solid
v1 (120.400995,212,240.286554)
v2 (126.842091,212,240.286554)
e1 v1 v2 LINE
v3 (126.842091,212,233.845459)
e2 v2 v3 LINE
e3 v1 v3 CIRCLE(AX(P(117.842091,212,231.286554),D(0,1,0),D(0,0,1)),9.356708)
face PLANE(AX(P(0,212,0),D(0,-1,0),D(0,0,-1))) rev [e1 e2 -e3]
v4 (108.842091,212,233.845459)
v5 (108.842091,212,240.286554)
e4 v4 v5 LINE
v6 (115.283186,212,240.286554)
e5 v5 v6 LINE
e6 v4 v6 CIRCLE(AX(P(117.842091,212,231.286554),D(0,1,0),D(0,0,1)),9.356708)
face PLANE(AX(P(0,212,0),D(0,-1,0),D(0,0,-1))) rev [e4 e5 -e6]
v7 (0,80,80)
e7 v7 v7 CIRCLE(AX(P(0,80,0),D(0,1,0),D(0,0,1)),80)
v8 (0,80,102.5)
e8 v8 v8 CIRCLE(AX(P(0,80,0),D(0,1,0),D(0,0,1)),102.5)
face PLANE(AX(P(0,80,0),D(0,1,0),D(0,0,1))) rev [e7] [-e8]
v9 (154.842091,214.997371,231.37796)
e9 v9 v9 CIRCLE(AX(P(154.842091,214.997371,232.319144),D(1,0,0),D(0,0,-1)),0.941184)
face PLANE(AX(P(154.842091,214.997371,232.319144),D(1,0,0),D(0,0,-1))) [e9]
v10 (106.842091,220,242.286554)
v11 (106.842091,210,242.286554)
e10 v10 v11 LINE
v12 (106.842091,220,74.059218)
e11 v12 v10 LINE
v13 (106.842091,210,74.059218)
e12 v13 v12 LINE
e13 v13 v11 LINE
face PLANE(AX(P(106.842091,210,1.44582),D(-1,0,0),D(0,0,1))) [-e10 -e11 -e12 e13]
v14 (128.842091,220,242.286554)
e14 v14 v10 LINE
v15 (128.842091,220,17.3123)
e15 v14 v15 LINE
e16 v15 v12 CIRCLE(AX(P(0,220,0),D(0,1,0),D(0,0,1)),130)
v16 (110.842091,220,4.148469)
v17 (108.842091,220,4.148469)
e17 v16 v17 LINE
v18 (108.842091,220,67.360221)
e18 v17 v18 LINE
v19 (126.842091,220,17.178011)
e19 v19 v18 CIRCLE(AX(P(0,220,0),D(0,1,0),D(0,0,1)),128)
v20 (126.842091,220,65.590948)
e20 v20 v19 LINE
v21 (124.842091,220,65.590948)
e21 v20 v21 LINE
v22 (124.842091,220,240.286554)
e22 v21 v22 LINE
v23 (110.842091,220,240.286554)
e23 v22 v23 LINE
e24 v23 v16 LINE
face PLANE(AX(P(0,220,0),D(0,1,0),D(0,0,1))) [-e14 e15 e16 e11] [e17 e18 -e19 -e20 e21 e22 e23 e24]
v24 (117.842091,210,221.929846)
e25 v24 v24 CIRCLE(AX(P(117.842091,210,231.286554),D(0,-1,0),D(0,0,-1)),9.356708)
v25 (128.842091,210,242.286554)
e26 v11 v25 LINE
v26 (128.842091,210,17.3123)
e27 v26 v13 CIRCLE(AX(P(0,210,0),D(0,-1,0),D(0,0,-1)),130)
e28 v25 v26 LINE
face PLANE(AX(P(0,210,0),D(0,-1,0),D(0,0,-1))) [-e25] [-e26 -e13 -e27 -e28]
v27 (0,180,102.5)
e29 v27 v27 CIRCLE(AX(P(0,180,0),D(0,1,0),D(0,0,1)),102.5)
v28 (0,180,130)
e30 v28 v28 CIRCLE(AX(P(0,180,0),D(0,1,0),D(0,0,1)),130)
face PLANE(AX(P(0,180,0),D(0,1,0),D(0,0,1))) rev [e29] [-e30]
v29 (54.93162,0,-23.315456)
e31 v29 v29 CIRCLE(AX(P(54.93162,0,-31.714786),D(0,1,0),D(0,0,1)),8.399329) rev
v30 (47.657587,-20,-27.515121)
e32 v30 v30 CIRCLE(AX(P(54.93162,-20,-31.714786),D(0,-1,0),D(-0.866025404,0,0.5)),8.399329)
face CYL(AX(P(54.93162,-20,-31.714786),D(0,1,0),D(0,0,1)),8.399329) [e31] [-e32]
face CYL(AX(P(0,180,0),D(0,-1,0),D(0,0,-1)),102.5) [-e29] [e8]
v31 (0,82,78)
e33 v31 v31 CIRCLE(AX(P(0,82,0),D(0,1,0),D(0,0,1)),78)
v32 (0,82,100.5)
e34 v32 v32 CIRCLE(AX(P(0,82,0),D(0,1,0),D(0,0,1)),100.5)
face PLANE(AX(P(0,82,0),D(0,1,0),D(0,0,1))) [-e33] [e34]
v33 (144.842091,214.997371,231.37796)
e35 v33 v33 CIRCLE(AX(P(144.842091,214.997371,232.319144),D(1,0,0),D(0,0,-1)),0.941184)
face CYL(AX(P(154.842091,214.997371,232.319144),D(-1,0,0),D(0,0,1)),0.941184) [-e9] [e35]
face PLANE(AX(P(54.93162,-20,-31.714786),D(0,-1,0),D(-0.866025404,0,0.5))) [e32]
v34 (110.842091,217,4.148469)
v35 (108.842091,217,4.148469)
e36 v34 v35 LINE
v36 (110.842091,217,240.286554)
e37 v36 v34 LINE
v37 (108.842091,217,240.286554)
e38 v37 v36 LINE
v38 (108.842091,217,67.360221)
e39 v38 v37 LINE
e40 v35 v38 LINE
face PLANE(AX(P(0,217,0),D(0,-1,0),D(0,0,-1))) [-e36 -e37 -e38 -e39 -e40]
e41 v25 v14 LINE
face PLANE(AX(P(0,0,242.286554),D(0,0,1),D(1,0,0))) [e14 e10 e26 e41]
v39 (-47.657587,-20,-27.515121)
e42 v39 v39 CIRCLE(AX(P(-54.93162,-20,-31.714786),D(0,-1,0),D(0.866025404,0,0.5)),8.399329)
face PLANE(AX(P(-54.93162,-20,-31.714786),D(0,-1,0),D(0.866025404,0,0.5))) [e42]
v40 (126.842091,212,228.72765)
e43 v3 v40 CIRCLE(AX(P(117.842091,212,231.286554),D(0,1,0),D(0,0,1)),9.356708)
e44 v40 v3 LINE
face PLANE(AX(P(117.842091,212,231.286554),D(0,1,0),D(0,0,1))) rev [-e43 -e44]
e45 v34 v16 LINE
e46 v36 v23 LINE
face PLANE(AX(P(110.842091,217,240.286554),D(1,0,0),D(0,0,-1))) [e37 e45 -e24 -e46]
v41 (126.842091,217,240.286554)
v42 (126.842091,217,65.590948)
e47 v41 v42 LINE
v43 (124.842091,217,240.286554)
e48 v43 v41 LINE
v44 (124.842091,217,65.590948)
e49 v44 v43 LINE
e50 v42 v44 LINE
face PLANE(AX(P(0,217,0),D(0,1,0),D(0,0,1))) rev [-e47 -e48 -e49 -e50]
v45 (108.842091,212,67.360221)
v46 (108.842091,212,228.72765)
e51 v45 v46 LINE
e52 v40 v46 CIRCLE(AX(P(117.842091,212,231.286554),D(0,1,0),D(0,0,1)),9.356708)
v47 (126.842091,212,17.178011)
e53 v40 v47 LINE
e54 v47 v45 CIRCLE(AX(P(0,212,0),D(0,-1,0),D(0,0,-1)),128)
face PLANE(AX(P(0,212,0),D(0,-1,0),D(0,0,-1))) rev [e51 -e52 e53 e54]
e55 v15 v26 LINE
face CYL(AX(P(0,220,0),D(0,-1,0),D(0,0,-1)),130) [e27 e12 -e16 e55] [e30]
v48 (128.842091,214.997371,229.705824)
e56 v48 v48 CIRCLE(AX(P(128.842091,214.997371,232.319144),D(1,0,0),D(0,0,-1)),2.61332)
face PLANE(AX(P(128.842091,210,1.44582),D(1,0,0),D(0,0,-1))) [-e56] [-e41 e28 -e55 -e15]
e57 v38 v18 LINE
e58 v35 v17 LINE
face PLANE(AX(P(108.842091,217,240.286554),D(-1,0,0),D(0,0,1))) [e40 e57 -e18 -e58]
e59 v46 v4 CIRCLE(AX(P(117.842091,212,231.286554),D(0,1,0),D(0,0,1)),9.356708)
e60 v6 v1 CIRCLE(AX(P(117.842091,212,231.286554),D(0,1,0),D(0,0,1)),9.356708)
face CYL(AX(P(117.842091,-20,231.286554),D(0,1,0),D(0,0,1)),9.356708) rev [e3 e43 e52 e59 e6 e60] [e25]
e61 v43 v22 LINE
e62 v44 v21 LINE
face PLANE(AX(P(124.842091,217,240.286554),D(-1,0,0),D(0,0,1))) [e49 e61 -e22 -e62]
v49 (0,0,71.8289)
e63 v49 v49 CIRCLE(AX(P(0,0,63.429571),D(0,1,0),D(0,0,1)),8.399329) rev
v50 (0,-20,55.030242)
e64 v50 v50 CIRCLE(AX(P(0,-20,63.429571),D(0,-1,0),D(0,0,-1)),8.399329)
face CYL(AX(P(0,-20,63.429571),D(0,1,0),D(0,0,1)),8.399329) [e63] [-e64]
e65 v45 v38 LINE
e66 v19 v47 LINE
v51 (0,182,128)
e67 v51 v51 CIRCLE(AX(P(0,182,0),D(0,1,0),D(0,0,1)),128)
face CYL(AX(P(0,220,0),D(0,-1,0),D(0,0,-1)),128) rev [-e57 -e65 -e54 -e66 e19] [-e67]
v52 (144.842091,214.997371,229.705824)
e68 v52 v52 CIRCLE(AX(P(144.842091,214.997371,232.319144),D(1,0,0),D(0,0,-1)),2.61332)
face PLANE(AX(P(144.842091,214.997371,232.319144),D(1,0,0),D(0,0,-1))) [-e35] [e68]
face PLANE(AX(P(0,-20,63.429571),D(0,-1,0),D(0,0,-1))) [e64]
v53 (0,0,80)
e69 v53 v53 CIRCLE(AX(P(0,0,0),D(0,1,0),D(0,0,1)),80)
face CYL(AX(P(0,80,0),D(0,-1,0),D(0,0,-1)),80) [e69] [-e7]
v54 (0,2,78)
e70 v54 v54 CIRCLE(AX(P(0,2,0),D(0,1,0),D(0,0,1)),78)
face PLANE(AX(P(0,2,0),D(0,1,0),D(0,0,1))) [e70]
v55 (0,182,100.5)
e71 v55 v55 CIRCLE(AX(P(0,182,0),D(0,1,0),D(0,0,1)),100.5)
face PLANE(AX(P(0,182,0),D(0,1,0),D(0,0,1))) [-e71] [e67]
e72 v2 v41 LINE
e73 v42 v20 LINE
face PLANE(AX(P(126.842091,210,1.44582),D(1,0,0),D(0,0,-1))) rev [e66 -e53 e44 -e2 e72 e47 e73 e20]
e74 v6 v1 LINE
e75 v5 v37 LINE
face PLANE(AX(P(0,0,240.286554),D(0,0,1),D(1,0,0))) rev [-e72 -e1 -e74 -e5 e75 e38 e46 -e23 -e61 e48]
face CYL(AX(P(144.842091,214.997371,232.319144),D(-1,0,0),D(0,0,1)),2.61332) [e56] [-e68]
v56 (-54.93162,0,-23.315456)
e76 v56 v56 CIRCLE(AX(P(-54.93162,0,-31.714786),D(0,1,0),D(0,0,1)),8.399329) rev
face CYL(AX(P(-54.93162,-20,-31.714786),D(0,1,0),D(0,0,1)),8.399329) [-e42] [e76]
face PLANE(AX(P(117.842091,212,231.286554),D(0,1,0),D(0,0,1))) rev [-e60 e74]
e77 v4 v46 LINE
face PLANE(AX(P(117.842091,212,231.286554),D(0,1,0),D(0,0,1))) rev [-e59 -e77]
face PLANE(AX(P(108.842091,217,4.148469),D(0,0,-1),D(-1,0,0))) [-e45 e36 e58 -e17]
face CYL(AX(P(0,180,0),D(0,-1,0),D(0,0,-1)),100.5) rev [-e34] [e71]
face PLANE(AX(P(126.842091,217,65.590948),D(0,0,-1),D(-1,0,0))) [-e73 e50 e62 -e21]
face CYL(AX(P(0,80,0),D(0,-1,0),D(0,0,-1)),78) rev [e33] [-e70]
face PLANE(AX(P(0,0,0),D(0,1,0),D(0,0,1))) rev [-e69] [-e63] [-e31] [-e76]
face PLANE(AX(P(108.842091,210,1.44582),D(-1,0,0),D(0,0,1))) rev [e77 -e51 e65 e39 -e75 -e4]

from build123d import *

# Parameters (mm, degrees)
SKETCH_3_R               = 80
EXTRUDE_1_DEPTH          = 80
SKETCH_4_R               = 102.5
EXTRUDE_2_DEPTH          = 100
SKETCH_5_R               = 130
EXTRUDE_3_DEPTH          = 40
SKETCH_6_W               = 22
SKETCH_6_H               = 240.840734586
EXTRUDE_4_DEPTH          = 10
SHELL_START              = 82
SHELL_1_OUTLINE_R        = 100.5
SHELL_1_DEPTH            = 138
SHELL_START_2            = 2
SHELL_1_2_OUTLINE_R      = 78
SHELL_1_2_DEPTH          = 80
SHELL_START_3            = 182
SHELL_1_3_OUTLINE_R      = 128
SHELL_1_3_OUTLINE_R_2    = 100.5
SHELL_1_3_DEPTH          = 38
SHELL_START_4            = 212
SHELL_1_4_DEPTH          = 8
SKETCH_7_R               = 8.399329468
EXTRUDE_5_DEPTH          = 20
PATTERN_CIRCULAR_1_COUNT = 3
SKETCH_9_W               = 22
SKETCH_9_H               = 2
CUT_EXTRUDE_1_DEPTH      = 365.969552782
SKETCH_10_W              = 2
SKETCH_10_H              = 236.138085802
SKETCH_10_H_2            = 174.695606664
EXTRUDE_6_DEPTH          = 3
SKETCH_11_W              = 22
SKETCH_11_H              = 10
EXTRUDE_7_DEPTH          = 2
SKETCH_12_R              = 9.35670837
CUT_EXTRUDE_2_DEPTH      = 360.759328521
SKETCH_13_R              = 2.613319885
EXTRUDE_8_DEPTH          = 16
SKETCH_14_R              = 0.941183601
EXTRUDE_9_DEPTH          = 10


# Read off the part's stored shape, not the designer's step: 抽壳1
with BuildPart() as part:
    # 草图3 → 凸台-拉伸1 (new body)
    with BuildSketch(Plane(origin=(0, 0, 0), x_dir=(1, 0, 0), z_dir=(0, 1, 0))):
        with Locations(Location((0, 0, 0), (0, 0, 270))):
            Circle(SKETCH_3_R)
    extrude(amount=EXTRUDE_1_DEPTH)

    # 草图4 → 凸台-拉伸2 (add)
    with BuildSketch(Plane(origin=(0, 80, 0), x_dir=(1, 0, 0), z_dir=(0, 1, 0))):
        with Locations(Location((0, 0, 0), (0, 0, 270))):
            Circle(SKETCH_4_R)
    extrude(amount=EXTRUDE_2_DEPTH)

    # 草图5 → 凸台-拉伸3 (add)
    with BuildSketch(Plane(origin=(0, 180, 0), x_dir=(1, 0, 0), z_dir=(0, 1, 0))):
        with Locations(Location((0, 0, 0), (0, 0, 270))):
            Circle(SKETCH_5_R)
    extrude(amount=EXTRUDE_3_DEPTH)

    # 草图6 → 凸台-拉伸4 (add)
    with BuildSketch(Plane(origin=(0, 220, 0), x_dir=(1, 0, 0), z_dir=(0, 1, 0))):
        with Locations((117.8420905, -121.866187138)):
            Rectangle(SKETCH_6_W, SKETCH_6_H)
    extrude(amount=-EXTRUDE_4_DEPTH)

    # 抽壳1 outline → 抽壳1 (cut)
    with BuildSketch(Plane(origin=(0, 0, 0), x_dir=(1, 0, 0), z_dir=(0, 1, 0)).offset(SHELL_START)):
        Circle(SHELL_1_OUTLINE_R)
    extrude(amount=SHELL_1_DEPTH, mode=Mode.SUBTRACT)

    # Shell 1 2 outline → Shell 1 2 (cut)
    with BuildSketch(Plane(origin=(0, 0, 0), x_dir=(1, 0, 0), z_dir=(0, 1, 0)).offset(SHELL_START_2)):
        Circle(SHELL_1_2_OUTLINE_R)
    extrude(amount=SHELL_1_2_DEPTH, mode=Mode.SUBTRACT)

    # Shell 1 3 outline → Shell 1 3 (cut)
    with BuildSketch(Plane(origin=(0, 0, 0), x_dir=(1, 0, 0), z_dir=(0, 1, 0)).offset(SHELL_START_3)):
        Circle(SHELL_1_3_OUTLINE_R)
        Circle(SHELL_1_3_OUTLINE_R_2, mode=Mode.SUBTRACT)
    extrude(amount=SHELL_1_3_DEPTH, mode=Mode.SUBTRACT)

    # Shell 1 4 outline → Shell 1 4 (cut)
    with BuildSketch(Plane(origin=(0, 0, 0), x_dir=(1, 0, 0), z_dir=(0, 1, 0)).offset(SHELL_START_4)):
        with BuildLine():
            ThreePointArc((126.8420905, -17.178011456), (120.483699417, -43.216642337), (108.8420905, -67.360220721))
            Line((108.8420905, -67.360220721), (108.8420905, -240.286554431))
            Line((108.8420905, -240.286554431), (126.8420905, -240.286554431))
            Line((126.8420905, -240.286554431), (126.8420905, -17.178011456))
        make_face()
    extrude(amount=SHELL_1_4_DEPTH, mode=Mode.SUBTRACT)

    # 草图7 → 凸台-拉伸5 (add)
    with BuildSketch(Plane.XZ):
        with Locations(Location((0, 63.429571018, 0), (0, 0, 90))):
            Circle(SKETCH_7_R)
    extrude_5 = extrude(amount=EXTRUDE_5_DEPTH)

    # 阵列(圆周)1: 凸台-拉伸5 ×3 about axis
    pattern_circular_1_axis = Axis((0, 0, 0), (0, 1, 0))
    for i in range(1, PATTERN_CIRCULAR_1_COUNT):
        add(extrude_5.rotate(pattern_circular_1_axis, i * 360 / PATTERN_CIRCULAR_1_COUNT))

    # 草图9 → 切除-拉伸1 (cut, through all)
    with BuildSketch(Plane(origin=(0, 220, 0), x_dir=(1, 0, 0), z_dir=(0, 1, 0))):
        with Locations((117.8420905, -241.286554431)):
            Rectangle(SKETCH_9_W, SKETCH_9_H)
    extrude(amount=-CUT_EXTRUDE_1_DEPTH, mode=Mode.SUBTRACT)

    # 草图10 → 凸台-拉伸6 (add)
    with BuildSketch(Plane(origin=(0, 220, 0), x_dir=(1, 0, 0), z_dir=(0, 1, 0))):
        with Locations((109.8420905, -122.21751153)):
            Rectangle(SKETCH_10_W, SKETCH_10_H)
        with Locations((125.8420905, -152.938751099)):
            Rectangle(SKETCH_10_W, SKETCH_10_H_2)
    extrude(amount=-EXTRUDE_6_DEPTH)

    # 草图11 → 凸台-拉伸7 (add)
    with BuildSketch(Plane.XY.offset(240.286554431)):
        with Locations((117.8420905, 215)):
            Rectangle(SKETCH_11_W, SKETCH_11_H)
    extrude(amount=EXTRUDE_7_DEPTH)

    # 草图12 → 切除-拉伸2 (cut, through all)
    with BuildSketch(Plane(origin=(0, 212, 0), x_dir=(1, 0, 0), z_dir=(0, 1, 0))):
        with Locations(Location((117.8420905, -231.286554431, 0), (0, 0, 254.128345291))):
            Circle(SKETCH_12_R)
    extrude(amount=-CUT_EXTRUDE_2_DEPTH, mode=Mode.SUBTRACT)

    # 草图13 → 凸台-拉伸8 (add)
    with BuildSketch(Plane(origin=(128.8420905, 0, 0), x_dir=(0, 0, -1), z_dir=(1, 0, 0))):
        with Locations((-232.319143826, 214.997371462)):
            Circle(SKETCH_13_R)
    extrude(amount=EXTRUDE_8_DEPTH)

    # 草图14 → 凸台-拉伸9 (add)
    with BuildSketch(Plane(origin=(144.8420905, 0, 0), x_dir=(0, 0, -1), z_dir=(1, 0, 0))):
        with Locations((-232.319143826, 214.997371462)):
            Circle(SKETCH_14_R)
    extrude(amount=EXTRUDE_9_DEPTH)


solid = part.part
